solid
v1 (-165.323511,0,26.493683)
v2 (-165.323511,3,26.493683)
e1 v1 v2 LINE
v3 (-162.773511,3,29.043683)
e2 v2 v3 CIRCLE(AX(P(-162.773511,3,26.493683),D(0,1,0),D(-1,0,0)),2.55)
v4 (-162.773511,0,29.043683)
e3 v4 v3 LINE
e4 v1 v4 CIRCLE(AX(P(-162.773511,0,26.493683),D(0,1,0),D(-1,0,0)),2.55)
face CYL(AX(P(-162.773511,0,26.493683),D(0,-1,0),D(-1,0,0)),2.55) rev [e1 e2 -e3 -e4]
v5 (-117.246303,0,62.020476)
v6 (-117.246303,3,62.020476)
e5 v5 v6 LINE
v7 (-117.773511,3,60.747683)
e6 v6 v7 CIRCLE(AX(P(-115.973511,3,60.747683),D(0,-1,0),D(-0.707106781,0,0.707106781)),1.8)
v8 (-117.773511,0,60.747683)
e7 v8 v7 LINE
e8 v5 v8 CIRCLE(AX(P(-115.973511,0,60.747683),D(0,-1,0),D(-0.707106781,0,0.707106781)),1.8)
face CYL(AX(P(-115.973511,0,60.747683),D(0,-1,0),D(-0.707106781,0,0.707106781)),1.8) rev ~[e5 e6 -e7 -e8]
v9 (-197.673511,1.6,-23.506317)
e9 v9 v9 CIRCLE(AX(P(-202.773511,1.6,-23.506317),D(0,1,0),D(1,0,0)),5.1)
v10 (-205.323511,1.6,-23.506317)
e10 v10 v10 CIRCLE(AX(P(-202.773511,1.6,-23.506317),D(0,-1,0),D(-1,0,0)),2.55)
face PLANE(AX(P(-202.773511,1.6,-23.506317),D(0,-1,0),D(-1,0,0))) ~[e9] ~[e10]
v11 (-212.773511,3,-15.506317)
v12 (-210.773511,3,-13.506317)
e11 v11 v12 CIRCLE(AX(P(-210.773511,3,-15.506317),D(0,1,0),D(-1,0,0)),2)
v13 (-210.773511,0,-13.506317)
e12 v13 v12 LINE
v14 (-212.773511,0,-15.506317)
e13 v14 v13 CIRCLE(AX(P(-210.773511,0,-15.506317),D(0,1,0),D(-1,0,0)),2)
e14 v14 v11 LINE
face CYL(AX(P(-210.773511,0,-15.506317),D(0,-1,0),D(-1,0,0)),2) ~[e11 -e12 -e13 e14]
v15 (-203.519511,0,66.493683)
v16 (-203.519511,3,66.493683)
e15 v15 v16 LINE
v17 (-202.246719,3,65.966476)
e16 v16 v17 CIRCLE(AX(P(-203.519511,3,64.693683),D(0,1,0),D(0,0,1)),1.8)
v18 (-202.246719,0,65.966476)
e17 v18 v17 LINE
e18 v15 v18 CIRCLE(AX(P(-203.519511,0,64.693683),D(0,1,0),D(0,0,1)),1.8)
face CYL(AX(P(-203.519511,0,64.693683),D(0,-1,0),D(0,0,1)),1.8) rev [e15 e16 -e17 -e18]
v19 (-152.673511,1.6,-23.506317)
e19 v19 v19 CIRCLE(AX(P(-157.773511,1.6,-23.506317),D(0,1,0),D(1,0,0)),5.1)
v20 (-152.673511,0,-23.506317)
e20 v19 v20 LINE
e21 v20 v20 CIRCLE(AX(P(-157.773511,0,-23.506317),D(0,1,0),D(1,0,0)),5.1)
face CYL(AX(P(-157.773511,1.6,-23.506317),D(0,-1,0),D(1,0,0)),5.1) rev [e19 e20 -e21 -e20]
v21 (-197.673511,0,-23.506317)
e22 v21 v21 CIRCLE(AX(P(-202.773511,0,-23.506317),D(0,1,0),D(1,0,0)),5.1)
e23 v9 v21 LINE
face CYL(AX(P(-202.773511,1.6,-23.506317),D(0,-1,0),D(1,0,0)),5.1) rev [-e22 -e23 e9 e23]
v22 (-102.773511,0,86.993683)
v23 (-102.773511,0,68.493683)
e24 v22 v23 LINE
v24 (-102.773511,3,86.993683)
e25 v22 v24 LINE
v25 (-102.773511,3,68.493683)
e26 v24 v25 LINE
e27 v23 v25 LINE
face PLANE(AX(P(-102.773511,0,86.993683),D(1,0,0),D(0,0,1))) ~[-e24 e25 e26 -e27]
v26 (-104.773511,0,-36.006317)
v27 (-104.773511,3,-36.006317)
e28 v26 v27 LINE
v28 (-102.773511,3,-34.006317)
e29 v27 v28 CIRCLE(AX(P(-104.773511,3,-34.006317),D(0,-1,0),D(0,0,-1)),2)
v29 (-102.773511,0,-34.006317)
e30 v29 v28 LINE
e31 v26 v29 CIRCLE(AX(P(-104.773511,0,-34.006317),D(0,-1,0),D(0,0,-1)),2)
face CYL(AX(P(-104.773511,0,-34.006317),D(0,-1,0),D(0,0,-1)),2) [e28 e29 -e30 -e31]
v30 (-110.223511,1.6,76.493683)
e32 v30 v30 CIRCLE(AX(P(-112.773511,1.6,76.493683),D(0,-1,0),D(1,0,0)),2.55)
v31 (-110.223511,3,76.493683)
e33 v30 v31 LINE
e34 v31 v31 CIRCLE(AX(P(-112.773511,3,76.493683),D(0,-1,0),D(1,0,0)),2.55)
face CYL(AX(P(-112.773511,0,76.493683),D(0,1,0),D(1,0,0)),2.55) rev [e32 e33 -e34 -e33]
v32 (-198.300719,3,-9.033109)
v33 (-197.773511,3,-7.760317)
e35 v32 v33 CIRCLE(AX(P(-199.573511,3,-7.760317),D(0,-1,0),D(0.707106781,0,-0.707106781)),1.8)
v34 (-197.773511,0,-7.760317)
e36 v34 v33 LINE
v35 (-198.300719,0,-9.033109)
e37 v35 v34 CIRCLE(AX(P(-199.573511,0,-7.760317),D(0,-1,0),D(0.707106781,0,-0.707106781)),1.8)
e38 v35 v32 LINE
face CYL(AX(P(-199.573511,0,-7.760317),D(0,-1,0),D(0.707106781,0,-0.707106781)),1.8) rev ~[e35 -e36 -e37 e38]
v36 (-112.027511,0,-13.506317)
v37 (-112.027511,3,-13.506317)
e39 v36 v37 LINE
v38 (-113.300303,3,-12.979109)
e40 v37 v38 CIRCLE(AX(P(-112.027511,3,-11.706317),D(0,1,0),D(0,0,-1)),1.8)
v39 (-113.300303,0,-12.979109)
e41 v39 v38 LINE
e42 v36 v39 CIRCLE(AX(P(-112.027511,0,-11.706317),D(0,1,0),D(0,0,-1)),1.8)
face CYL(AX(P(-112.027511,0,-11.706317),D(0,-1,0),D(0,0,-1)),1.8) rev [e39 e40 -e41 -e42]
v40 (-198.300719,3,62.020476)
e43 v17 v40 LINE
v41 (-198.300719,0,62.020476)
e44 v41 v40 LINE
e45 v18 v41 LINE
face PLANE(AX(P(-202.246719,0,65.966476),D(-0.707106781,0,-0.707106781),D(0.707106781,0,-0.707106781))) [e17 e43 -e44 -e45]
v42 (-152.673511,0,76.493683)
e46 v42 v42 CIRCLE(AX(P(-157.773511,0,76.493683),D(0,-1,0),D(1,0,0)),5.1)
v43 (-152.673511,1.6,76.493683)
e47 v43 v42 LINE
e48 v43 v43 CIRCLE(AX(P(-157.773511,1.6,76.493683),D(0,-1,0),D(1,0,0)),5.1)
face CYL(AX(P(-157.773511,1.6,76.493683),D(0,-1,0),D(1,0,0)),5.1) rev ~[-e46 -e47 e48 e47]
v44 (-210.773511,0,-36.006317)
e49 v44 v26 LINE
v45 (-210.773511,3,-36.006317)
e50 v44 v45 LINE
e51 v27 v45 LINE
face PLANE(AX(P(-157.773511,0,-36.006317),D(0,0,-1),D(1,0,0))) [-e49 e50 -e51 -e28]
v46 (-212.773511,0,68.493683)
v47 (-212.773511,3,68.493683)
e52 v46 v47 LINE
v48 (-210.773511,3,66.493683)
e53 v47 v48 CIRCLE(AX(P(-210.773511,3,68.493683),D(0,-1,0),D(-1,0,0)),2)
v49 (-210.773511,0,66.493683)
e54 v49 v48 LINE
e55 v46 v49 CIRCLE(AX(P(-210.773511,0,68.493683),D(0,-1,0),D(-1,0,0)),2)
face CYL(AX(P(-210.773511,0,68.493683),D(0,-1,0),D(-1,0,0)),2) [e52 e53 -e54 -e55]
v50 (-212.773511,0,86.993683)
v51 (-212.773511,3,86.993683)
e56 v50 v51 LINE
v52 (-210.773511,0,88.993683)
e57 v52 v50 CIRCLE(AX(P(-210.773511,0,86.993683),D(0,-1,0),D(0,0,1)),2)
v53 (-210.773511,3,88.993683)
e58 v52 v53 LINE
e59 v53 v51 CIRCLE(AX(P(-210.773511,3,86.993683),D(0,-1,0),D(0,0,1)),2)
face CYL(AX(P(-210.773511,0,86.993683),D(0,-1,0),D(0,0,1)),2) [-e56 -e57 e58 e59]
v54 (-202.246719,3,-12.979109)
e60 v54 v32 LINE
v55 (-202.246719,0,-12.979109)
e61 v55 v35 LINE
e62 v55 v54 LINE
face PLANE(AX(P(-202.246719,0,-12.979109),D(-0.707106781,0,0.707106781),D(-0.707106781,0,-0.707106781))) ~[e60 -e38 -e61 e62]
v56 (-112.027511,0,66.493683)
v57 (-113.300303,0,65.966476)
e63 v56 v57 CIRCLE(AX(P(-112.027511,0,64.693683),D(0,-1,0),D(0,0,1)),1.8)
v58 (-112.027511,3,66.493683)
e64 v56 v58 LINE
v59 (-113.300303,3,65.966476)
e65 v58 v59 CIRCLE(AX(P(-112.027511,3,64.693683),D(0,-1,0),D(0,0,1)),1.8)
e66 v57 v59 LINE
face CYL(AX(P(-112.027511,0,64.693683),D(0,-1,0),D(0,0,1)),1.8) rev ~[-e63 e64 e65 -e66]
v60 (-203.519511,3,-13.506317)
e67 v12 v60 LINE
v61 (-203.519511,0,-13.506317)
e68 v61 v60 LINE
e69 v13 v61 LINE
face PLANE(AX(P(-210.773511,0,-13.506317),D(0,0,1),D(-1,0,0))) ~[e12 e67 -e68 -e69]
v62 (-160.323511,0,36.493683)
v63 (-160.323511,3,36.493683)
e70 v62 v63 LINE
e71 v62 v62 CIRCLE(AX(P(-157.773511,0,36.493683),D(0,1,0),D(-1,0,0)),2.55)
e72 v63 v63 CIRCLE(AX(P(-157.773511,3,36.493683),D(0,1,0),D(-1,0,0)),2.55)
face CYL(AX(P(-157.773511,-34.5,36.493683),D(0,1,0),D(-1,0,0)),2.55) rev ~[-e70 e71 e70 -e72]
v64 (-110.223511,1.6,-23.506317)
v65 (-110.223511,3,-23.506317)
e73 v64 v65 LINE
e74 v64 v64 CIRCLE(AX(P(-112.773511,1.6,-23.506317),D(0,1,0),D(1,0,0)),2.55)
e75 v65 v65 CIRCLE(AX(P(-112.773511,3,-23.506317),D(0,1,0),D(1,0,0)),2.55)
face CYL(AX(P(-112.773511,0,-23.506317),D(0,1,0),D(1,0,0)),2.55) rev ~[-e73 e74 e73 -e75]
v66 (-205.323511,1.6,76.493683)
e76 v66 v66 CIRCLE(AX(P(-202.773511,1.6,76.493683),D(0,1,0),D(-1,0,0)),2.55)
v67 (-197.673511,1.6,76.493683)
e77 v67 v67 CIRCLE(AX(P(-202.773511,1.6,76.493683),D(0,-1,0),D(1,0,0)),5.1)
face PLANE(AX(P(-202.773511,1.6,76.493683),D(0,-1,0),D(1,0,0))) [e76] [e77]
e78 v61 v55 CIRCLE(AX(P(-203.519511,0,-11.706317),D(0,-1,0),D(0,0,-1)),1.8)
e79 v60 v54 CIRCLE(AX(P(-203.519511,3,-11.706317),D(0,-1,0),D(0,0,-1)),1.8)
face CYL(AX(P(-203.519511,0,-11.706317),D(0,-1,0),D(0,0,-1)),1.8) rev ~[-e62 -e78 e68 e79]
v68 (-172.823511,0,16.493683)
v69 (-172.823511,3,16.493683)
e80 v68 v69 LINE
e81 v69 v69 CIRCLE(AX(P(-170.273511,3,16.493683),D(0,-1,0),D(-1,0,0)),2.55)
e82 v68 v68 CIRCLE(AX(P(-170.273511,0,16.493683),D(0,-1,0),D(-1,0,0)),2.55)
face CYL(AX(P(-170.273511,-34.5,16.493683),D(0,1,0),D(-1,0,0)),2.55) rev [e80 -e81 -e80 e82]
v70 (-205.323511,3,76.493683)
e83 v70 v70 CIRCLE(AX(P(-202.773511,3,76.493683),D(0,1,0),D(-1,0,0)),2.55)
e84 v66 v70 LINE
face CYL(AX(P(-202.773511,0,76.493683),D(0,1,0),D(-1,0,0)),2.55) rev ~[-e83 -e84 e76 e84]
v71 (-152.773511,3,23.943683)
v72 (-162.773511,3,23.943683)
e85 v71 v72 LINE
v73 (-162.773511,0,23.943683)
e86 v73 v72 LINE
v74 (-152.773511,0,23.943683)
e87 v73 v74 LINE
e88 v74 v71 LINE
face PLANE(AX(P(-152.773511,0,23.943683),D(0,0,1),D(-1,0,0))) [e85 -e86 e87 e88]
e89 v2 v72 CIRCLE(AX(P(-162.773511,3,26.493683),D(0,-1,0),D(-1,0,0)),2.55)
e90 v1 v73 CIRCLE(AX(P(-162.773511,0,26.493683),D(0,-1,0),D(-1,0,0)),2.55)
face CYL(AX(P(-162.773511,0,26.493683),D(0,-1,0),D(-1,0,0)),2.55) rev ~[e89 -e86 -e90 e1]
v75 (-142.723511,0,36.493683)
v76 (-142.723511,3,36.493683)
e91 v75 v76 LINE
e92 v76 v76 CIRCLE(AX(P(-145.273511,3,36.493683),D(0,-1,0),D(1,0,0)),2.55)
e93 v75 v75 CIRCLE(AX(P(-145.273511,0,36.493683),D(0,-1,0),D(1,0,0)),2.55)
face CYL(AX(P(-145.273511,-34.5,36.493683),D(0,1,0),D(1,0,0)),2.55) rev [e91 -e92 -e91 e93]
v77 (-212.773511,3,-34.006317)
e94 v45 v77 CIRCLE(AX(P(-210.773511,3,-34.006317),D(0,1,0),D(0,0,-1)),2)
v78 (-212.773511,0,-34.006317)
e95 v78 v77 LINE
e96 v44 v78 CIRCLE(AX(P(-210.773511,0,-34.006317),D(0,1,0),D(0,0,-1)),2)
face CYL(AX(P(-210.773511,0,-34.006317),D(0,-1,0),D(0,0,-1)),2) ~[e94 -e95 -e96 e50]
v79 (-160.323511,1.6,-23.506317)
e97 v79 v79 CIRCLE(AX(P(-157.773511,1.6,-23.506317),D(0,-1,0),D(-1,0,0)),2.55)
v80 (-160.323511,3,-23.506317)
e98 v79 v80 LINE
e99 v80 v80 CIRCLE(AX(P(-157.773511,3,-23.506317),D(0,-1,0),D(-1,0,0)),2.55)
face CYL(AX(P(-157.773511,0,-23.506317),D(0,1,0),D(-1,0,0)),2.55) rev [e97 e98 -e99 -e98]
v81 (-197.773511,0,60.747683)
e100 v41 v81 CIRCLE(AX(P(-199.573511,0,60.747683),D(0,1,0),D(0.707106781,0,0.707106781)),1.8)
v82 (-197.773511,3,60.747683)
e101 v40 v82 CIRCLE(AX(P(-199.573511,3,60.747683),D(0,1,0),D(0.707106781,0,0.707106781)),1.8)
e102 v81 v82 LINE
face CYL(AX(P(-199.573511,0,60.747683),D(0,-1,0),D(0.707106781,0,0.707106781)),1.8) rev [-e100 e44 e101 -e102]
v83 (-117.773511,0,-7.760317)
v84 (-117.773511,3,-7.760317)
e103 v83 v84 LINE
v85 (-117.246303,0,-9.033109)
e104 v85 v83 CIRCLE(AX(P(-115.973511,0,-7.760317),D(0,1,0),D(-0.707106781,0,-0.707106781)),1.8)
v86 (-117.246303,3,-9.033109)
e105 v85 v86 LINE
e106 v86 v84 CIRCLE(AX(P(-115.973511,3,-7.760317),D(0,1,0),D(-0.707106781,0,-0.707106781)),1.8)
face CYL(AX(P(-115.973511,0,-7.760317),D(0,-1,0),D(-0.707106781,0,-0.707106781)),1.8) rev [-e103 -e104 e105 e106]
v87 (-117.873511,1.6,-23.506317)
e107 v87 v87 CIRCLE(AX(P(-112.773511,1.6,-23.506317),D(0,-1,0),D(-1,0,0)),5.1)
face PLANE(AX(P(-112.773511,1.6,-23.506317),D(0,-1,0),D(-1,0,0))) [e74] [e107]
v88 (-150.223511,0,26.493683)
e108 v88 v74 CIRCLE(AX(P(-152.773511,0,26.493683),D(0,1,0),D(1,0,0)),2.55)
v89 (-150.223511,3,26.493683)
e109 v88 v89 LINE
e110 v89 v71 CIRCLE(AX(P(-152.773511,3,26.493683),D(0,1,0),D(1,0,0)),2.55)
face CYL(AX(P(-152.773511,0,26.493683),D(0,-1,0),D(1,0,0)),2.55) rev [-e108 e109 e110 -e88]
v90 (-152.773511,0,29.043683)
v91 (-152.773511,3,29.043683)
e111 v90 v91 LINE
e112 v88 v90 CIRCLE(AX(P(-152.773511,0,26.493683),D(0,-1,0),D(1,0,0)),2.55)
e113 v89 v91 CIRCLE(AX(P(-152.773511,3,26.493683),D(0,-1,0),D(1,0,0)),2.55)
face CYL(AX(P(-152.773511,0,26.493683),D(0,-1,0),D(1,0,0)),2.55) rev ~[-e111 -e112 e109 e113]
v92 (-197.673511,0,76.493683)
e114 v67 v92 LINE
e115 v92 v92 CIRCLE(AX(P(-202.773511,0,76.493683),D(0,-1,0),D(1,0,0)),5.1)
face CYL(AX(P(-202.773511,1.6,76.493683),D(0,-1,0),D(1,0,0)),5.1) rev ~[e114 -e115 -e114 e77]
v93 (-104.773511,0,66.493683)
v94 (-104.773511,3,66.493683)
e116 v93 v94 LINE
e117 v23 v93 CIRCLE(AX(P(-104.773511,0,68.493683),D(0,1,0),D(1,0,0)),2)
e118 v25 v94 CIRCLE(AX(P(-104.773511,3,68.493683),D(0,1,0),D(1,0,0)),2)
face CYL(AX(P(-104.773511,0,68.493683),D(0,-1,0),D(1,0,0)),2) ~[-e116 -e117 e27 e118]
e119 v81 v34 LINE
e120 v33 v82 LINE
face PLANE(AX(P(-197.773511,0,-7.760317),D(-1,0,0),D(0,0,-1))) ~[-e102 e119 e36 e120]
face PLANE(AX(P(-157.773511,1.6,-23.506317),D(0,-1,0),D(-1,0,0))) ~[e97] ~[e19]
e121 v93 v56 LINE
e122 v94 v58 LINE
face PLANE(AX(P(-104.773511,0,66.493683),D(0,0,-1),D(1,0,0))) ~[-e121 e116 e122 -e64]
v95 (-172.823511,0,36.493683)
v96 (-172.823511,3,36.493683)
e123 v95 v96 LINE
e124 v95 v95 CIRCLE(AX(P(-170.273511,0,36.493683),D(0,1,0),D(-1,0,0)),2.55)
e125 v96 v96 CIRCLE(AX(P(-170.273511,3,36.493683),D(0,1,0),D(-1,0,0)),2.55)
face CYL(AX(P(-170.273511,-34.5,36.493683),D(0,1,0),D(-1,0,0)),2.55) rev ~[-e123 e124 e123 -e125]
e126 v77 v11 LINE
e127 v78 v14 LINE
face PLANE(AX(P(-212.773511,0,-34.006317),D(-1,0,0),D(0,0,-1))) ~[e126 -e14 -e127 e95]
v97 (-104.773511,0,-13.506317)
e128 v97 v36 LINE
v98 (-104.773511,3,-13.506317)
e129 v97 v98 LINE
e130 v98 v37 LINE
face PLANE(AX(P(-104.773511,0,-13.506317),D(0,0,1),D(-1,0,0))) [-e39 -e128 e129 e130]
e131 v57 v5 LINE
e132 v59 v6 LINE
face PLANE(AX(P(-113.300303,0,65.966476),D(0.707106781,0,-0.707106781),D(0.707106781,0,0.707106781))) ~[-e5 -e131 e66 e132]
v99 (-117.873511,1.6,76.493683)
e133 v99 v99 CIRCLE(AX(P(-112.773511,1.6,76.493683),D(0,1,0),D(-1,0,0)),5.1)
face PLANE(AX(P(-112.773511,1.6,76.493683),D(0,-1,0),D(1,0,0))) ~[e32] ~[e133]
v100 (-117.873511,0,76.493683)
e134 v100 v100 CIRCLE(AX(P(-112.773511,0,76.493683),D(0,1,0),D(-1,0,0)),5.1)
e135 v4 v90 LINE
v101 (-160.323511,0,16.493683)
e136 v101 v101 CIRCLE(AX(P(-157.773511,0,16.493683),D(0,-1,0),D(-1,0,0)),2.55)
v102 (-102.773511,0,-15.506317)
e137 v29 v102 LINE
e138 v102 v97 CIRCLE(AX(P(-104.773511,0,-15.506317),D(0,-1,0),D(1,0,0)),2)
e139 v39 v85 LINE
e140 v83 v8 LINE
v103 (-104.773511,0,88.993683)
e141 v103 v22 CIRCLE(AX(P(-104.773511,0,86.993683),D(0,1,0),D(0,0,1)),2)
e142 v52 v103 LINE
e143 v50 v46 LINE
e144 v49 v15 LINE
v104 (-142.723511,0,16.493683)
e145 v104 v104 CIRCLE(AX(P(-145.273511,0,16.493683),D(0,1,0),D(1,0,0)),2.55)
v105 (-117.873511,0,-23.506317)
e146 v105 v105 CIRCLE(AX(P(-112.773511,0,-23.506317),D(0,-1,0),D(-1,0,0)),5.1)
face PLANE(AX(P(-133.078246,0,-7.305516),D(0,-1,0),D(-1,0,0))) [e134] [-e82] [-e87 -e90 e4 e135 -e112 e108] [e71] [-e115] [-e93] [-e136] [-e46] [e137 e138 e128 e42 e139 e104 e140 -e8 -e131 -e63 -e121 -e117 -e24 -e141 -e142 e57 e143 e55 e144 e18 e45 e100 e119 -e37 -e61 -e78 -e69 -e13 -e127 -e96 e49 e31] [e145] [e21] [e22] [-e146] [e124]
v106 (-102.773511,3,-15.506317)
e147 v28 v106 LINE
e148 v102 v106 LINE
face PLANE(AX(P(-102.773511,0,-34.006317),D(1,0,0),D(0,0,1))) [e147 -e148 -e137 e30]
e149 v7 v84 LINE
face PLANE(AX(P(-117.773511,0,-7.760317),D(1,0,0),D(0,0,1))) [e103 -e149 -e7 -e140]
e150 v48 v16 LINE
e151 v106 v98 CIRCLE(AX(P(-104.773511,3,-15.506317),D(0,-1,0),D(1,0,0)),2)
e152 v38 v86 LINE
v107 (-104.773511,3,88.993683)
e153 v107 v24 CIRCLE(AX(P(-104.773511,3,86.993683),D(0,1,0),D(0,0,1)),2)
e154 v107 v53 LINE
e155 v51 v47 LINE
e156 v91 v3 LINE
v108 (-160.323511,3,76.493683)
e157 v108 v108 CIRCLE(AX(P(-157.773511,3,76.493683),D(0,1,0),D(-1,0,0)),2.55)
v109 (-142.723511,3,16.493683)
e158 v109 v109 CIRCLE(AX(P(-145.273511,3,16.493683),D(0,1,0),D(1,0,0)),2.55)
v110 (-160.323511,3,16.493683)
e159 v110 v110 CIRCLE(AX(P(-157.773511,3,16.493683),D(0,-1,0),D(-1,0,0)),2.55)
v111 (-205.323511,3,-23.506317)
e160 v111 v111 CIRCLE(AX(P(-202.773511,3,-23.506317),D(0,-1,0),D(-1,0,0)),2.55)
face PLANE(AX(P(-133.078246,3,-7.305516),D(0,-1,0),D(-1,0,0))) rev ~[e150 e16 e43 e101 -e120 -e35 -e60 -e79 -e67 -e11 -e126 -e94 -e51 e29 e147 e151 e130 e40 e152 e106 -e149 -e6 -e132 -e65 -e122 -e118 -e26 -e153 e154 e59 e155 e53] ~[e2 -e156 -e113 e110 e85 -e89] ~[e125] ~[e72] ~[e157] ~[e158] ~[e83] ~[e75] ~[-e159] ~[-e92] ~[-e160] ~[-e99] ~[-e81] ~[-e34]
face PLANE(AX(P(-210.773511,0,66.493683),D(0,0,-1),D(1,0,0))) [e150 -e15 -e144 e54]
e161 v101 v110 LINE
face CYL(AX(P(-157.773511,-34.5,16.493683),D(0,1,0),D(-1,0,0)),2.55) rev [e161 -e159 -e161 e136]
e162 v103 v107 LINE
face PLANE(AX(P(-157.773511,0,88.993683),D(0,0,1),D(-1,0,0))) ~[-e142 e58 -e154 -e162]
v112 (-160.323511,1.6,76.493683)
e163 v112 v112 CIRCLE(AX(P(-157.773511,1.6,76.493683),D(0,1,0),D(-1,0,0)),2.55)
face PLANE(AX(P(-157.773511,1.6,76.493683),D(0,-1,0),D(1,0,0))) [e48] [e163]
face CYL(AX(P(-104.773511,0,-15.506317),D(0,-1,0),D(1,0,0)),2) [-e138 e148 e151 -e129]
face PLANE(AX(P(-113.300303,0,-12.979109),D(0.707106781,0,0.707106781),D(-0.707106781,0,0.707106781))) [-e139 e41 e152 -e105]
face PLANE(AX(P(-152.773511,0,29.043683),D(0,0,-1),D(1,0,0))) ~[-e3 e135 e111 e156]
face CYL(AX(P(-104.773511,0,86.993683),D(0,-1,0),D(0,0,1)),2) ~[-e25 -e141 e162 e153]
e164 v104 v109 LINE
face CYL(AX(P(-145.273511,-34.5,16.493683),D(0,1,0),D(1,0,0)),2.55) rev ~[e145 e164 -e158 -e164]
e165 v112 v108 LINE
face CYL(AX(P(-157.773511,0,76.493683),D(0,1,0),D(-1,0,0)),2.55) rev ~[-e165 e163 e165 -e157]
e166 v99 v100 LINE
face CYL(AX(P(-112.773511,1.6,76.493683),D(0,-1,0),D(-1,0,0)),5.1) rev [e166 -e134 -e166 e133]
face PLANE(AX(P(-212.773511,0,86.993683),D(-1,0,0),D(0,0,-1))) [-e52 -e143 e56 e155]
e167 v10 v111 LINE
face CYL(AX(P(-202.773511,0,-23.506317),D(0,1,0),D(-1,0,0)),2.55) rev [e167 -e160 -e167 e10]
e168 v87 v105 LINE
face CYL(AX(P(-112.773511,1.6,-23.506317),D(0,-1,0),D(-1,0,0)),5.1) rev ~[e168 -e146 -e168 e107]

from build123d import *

# Parameters (mm, degrees)
F1_DEPTH       = 3
F2_D           = 5.1
F2_DEPTH       = 34.5
F2_TIP         = 1.5321945785
F3_D           = 5.1
F3_DEPTH       = 34.5
F3_CBORE_D     = 10.2
F3_CBORE_DEPTH = 1.6
F3_TIP         = 1.5321945785
F5_D           = 5.1
F5_DEPTH       = 34.5
F5_TIP         = 1.5321945785
F6_D           = 5.1
F6_DEPTH       = 34.5
F6_CBORE_D     = 10.2
F6_CBORE_DEPTH = 1.6
F6_TIP         = 1.5321945785


# Not quite as in the source:
# - a feature names something its author has since deleted; it is built from what else it names


with BuildPart() as f1:
    # F0 (on Front) → F1 (new body)
    with BuildSketch(Plane.XZ):
        with BuildLine():
            Line((-157.7735108339, 88.9936834574), (-210.7735108339, 88.9936834574))
            ThreePointArc((-210.7735108339, 88.9936834574), (-212.1877243962, 88.4078970197), (-212.7735108339, 86.9936834574))
            Line((-212.7735108339, 86.9936834574), (-212.7735108339, 68.4936834574))
            ThreePointArc((-212.7735108339, 68.4936834574), (-212.1877243962, 67.079469895), (-210.7735108339, 66.4936834574))
            Line((-210.7735108339, 66.4936834574), (-203.5195108339, 66.4936834574))
            ThreePointArc((-203.5195108339, 66.4936834574), (-202.8306806556, 66.3566666159), (-202.2467186277, 65.9664756635))
            Line((-202.2467186277, 65.9664756635), (-198.3007186277, 62.0204756635))
            ThreePointArc((-198.3007186277, 62.0204756635), (-197.9105276754, 61.4365136356), (-197.7735108339, 60.7476834574))
            Line((-197.7735108339, 60.7476834574), (-197.7735108339, 26.4936834574))
            Line((-197.7735108339, 26.4936834574), (-165.3235108339, 26.4936834574))
            ThreePointArc((-165.3235108339, 26.4936834574), (-164.5766331259, 28.2968057494), (-162.7735108339, 29.0436834574))
            Line((-162.7735108339, 29.0436834574), (-157.7735108339, 29.0436834574))
            Line((-157.7735108339, 29.0436834574), (-157.7735108339, 88.9936834574))
        make_face()
    extrude(amount=-F1_DEPTH)

    # F2
    with Locations(Plane.XZ):
        with Locations((-170.2735108339, 36.4936834574)):
            Hole(F2_D / 2, depth=F2_DEPTH)
            with Locations((0, 0, -(F2_DEPTH + F2_TIP / 2))):  # 118° drill point
                Cone(0, F2_D / 2, F2_TIP, mode=Mode.SUBTRACT)

    # F3
    with Locations(Plane.XZ):
        with Locations((-202.7735108339, 76.4936834574)):
            CounterBoreHole(F3_D / 2, F3_CBORE_D / 2, F3_CBORE_DEPTH, depth=F3_DEPTH)
            with Locations((0, 0, -(F3_DEPTH + F3_TIP / 2))):  # 118° drill point
                Cone(0, F3_D / 2, F3_TIP, mode=Mode.SUBTRACT)

    # F4: F1 across face


with BuildPart() as f1_1:
    add(f1.part)
    add(f1.part.mirror(Plane(origin=(-157.7735108339, 1.5, 59.0186834574), x_dir=(0, 1, 0), z_dir=(1, 0, 0))))

    # F5
    with Locations(Plane.XZ):
        with Locations((-157.7735108339, 36.4936834574)):
            Hole(F5_D / 2, depth=F5_DEPTH)
            with Locations((0, 0, -(F5_DEPTH + F5_TIP / 2))):  # 118° drill point
                Cone(0, F5_D / 2, F5_TIP, mode=Mode.SUBTRACT)

    # F6
    with Locations(Plane.XZ):
        with Locations((-157.7735108339, 76.4936834574)):
            CounterBoreHole(F6_D / 2, F6_CBORE_D / 2, F6_CBORE_DEPTH, depth=F6_DEPTH)
            with Locations((0, 0, -(F6_DEPTH + F6_TIP / 2))):  # 118° drill point
                Cone(0, F6_D / 2, F6_TIP, mode=Mode.SUBTRACT)

    # F7: F1 across face


with BuildPart() as f1_2:
    add(f1_1.part)
    add(f1_1.part.mirror(Plane(origin=(-181.5485108339, 1.5, 26.4936834574), x_dir=(1, 0, 0), z_dir=(0, 0, -1))))


solid = f1_2.part
